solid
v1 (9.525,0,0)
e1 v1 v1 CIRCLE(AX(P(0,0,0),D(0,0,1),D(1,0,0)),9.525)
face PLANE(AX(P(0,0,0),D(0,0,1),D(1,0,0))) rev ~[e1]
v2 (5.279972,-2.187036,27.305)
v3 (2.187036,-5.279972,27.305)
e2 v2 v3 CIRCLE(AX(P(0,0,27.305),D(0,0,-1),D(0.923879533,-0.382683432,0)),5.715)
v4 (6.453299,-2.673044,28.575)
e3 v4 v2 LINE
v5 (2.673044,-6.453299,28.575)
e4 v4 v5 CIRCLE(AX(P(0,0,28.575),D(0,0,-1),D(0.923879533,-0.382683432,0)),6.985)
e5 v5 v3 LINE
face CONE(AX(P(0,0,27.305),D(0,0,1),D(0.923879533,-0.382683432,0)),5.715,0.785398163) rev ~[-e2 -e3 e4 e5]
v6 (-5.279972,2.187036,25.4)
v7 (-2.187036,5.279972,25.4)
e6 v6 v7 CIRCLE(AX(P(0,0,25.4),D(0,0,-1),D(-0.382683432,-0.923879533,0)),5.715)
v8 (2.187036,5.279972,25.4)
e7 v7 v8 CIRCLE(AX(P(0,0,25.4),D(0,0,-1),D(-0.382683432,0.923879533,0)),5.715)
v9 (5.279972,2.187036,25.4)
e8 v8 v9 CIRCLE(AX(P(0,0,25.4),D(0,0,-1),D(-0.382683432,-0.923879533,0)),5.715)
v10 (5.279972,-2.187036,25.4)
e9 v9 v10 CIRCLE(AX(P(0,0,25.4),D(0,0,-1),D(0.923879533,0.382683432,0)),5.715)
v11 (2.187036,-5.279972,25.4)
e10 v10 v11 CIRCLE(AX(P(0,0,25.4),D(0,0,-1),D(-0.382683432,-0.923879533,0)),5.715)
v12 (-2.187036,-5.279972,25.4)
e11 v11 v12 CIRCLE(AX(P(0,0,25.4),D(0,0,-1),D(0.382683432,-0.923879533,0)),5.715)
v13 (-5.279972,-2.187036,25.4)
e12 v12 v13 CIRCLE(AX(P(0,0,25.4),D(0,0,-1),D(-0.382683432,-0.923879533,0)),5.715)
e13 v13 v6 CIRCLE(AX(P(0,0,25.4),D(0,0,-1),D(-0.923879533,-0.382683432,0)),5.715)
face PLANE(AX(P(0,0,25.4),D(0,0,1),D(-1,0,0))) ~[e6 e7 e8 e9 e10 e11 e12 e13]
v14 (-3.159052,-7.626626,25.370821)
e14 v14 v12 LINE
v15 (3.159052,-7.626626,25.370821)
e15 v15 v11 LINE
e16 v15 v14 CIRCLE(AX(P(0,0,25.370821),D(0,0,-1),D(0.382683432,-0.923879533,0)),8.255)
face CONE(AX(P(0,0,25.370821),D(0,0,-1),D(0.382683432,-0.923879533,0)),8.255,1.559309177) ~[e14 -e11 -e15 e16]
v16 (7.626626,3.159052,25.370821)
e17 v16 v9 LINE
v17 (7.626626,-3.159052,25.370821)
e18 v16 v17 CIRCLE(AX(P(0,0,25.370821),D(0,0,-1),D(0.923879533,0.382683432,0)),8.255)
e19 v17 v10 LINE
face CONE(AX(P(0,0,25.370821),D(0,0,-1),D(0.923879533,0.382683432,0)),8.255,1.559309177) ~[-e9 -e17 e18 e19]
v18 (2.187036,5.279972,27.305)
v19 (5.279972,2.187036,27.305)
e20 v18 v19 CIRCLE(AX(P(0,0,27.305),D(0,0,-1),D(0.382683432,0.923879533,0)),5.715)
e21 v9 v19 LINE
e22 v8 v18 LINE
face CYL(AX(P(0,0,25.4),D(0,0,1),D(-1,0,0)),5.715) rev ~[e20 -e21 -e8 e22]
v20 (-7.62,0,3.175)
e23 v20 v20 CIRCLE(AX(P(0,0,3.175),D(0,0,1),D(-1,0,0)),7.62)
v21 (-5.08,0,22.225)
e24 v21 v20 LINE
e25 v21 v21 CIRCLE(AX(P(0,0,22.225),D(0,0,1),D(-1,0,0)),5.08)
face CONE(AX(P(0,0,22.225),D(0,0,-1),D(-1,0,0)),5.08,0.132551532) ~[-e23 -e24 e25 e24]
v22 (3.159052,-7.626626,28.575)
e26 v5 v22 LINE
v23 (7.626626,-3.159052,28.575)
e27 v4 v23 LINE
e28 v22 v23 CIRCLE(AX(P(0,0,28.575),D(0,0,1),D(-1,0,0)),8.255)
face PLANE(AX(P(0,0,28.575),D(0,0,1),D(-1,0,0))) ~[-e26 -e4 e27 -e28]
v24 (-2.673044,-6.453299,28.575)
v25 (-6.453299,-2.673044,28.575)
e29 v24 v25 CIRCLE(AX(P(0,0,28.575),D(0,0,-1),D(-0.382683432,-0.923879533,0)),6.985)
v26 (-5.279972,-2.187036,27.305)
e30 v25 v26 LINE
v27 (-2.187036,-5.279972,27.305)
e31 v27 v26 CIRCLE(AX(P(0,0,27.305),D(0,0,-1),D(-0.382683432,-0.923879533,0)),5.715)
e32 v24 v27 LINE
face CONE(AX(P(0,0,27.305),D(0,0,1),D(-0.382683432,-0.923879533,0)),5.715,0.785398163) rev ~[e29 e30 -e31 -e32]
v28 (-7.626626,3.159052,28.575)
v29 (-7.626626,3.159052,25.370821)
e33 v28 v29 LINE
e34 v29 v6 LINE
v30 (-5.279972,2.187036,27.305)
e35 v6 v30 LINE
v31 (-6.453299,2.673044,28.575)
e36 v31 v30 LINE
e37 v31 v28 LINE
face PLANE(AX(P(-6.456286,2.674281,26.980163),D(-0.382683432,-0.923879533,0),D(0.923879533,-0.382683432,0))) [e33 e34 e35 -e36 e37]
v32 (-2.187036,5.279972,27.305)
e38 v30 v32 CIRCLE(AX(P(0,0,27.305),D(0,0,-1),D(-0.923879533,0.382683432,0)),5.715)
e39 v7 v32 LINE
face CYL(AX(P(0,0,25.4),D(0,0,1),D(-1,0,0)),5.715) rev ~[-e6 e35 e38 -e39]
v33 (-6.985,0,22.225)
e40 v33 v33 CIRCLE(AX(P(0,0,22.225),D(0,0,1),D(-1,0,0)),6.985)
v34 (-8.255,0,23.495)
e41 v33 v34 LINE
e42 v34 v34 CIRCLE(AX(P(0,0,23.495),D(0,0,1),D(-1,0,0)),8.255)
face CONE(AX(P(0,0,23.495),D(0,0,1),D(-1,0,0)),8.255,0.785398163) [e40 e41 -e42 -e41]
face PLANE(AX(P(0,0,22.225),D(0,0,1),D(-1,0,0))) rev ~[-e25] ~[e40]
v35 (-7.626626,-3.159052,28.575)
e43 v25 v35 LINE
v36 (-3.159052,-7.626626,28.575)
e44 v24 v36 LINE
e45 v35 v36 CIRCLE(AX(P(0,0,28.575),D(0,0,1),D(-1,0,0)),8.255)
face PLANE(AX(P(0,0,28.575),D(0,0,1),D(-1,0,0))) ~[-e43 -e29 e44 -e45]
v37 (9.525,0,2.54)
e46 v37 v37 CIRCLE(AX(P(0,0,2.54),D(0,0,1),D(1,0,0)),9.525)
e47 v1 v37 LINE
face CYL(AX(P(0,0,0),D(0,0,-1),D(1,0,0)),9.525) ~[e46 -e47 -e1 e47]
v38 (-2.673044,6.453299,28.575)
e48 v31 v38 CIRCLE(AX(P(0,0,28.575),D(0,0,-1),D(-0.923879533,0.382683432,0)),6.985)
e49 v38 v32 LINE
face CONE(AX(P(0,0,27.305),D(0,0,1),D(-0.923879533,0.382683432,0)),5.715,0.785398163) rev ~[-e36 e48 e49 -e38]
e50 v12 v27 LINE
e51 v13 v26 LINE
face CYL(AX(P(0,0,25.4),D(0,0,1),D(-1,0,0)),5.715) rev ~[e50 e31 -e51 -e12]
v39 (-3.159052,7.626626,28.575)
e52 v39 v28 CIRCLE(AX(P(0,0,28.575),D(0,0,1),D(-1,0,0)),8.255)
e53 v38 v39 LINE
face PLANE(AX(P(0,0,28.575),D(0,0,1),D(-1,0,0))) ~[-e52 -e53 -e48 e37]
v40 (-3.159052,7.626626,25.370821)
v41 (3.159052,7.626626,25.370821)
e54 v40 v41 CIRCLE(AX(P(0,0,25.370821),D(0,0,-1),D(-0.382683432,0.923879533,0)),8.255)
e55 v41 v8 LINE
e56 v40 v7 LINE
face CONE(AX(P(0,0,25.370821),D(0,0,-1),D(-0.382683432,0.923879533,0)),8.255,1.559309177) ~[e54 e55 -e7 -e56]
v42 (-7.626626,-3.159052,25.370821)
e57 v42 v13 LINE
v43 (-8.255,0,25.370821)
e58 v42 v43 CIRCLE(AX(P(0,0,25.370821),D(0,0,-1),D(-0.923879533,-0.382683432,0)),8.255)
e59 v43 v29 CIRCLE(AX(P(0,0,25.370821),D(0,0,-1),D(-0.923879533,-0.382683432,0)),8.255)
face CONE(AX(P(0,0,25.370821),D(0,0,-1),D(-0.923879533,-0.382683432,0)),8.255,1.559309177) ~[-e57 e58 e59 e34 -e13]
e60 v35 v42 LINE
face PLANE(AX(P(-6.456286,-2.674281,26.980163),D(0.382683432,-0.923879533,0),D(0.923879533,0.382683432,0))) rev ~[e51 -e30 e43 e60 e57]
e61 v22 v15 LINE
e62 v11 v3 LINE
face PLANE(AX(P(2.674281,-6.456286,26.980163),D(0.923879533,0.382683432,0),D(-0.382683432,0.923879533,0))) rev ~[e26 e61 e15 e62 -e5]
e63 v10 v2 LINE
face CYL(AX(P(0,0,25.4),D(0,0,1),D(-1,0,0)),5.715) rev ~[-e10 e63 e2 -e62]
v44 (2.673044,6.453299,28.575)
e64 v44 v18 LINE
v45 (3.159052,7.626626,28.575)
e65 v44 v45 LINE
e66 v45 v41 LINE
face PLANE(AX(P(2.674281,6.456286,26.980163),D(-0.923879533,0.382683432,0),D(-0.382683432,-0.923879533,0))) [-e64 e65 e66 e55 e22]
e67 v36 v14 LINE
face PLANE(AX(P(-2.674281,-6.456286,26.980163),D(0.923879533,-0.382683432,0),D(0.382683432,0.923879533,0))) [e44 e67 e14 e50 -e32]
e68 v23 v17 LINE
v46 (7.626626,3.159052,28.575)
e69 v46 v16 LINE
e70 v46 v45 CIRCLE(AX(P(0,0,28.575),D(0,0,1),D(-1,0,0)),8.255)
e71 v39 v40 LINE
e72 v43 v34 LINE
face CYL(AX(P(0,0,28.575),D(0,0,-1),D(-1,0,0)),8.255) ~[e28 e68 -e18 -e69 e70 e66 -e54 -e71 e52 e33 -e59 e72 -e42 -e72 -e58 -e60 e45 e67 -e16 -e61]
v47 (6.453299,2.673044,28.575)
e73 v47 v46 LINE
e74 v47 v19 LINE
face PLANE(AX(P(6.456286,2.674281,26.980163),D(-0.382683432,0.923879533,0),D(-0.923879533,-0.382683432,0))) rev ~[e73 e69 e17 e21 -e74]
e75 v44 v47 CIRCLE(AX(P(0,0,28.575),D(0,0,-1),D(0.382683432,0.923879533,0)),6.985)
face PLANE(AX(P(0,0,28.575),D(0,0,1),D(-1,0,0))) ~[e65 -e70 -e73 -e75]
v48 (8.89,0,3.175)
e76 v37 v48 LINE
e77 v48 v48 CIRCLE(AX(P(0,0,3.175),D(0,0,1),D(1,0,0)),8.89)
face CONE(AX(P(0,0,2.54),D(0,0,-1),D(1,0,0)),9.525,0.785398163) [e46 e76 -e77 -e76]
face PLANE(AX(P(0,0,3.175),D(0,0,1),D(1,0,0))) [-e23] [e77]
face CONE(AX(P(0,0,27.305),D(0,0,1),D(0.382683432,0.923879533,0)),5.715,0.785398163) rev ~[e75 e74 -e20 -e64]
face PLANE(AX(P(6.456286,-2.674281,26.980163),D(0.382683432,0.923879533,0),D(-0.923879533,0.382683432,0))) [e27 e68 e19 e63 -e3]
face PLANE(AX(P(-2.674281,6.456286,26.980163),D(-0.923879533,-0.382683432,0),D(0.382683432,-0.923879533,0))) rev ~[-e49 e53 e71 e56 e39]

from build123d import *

# Parameters (mm, degrees)
F0_R            = 9.525
F1_DEPTH        = 3.175
F2_SIZE         = 0.635
F6_ANGLE_BACK   = 22.5
F6_ANGLE        = 45
F6_COPIES_COUNT = 4
F7_SIZE         = 1.27
F8_SIZE         = 1.27


# Not quite as in the source:
# - a pattern or mirror of a feature is missing from the dataset's text; its kind, count and spacing are read off the source's solid


with BuildPart() as f1:
    # F0 (on Top) → F1 (new body)
    with BuildSketch(Plane.XY):
        Circle(F0_R)
    extrude(amount=F1_DEPTH)

    # F2
    f2_edges = [f1.edges().sort_by_distance(p)[0] for p in [
        (-9.525, 0, 3.175),
    ]]
    chamfer(f2_edges, length=F2_SIZE)

    # F3 (on Front) → F4 (revolve)
    with BuildSketch(Plane.XZ):
        Polygon((-5.08, 22.225), (-7.62, 3.175), (0, 3.175), (0, 22.225), (0, 25.4), (-5.715, 25.4), (-5.715, 28.575), (-8.255, 28.575), (-8.255, 22.225), align=None)
    revolve(axis=Axis((0, 0, 12.7), (0, 0, 1)))

    # F5 (on Right) → F6 (revolve, cut)
    with BuildSketch(Plane.YZ, mode=Mode.PRIVATE) as f6_sk:
        Polygon((-5.715, 25.4), (-5.715, 28.575), (-8.255, 28.575), (-8.255, 25.3708213568), align=None)
    f6 = revolve(f6_sk.sketch.rotate(Axis((0, 0, 12.7), (0, 0, -1)), -F6_ANGLE_BACK), axis=Axis((0, 0, 12.7), (0, 0, -1)), revolution_arc=F6_ANGLE, mode=Mode.SUBTRACT)

    # F6_copies: F6 ×4 about axis
    f6_copies_axis = Axis((0, 0, 0), (0, 0, 1))
    for i in range(1, F6_COPIES_COUNT):
        add(f6.rotate(f6_copies_axis, i * 360 / F6_COPIES_COUNT), mode=Mode.SUBTRACT)

    # F7
    f7_edges = [f1.edges().sort_by_distance(p)[0] for p in [
        (8.255, 0, 22.225),
    ]]
    chamfer(f7_edges, length=F7_SIZE)

    # F8
    f8_edges = [f1.edges().sort_by_distance(p)[0] for p in [
        (-4.041115, -4.041115, 28.575),
        (-4.041115, 4.041115, 28.575),
        (4.041115, -4.041115, 28.575),
        (4.041115, 4.041115, 28.575),
    ]]
    chamfer(f8_edges, length=F8_SIZE)


solid = f1.part
